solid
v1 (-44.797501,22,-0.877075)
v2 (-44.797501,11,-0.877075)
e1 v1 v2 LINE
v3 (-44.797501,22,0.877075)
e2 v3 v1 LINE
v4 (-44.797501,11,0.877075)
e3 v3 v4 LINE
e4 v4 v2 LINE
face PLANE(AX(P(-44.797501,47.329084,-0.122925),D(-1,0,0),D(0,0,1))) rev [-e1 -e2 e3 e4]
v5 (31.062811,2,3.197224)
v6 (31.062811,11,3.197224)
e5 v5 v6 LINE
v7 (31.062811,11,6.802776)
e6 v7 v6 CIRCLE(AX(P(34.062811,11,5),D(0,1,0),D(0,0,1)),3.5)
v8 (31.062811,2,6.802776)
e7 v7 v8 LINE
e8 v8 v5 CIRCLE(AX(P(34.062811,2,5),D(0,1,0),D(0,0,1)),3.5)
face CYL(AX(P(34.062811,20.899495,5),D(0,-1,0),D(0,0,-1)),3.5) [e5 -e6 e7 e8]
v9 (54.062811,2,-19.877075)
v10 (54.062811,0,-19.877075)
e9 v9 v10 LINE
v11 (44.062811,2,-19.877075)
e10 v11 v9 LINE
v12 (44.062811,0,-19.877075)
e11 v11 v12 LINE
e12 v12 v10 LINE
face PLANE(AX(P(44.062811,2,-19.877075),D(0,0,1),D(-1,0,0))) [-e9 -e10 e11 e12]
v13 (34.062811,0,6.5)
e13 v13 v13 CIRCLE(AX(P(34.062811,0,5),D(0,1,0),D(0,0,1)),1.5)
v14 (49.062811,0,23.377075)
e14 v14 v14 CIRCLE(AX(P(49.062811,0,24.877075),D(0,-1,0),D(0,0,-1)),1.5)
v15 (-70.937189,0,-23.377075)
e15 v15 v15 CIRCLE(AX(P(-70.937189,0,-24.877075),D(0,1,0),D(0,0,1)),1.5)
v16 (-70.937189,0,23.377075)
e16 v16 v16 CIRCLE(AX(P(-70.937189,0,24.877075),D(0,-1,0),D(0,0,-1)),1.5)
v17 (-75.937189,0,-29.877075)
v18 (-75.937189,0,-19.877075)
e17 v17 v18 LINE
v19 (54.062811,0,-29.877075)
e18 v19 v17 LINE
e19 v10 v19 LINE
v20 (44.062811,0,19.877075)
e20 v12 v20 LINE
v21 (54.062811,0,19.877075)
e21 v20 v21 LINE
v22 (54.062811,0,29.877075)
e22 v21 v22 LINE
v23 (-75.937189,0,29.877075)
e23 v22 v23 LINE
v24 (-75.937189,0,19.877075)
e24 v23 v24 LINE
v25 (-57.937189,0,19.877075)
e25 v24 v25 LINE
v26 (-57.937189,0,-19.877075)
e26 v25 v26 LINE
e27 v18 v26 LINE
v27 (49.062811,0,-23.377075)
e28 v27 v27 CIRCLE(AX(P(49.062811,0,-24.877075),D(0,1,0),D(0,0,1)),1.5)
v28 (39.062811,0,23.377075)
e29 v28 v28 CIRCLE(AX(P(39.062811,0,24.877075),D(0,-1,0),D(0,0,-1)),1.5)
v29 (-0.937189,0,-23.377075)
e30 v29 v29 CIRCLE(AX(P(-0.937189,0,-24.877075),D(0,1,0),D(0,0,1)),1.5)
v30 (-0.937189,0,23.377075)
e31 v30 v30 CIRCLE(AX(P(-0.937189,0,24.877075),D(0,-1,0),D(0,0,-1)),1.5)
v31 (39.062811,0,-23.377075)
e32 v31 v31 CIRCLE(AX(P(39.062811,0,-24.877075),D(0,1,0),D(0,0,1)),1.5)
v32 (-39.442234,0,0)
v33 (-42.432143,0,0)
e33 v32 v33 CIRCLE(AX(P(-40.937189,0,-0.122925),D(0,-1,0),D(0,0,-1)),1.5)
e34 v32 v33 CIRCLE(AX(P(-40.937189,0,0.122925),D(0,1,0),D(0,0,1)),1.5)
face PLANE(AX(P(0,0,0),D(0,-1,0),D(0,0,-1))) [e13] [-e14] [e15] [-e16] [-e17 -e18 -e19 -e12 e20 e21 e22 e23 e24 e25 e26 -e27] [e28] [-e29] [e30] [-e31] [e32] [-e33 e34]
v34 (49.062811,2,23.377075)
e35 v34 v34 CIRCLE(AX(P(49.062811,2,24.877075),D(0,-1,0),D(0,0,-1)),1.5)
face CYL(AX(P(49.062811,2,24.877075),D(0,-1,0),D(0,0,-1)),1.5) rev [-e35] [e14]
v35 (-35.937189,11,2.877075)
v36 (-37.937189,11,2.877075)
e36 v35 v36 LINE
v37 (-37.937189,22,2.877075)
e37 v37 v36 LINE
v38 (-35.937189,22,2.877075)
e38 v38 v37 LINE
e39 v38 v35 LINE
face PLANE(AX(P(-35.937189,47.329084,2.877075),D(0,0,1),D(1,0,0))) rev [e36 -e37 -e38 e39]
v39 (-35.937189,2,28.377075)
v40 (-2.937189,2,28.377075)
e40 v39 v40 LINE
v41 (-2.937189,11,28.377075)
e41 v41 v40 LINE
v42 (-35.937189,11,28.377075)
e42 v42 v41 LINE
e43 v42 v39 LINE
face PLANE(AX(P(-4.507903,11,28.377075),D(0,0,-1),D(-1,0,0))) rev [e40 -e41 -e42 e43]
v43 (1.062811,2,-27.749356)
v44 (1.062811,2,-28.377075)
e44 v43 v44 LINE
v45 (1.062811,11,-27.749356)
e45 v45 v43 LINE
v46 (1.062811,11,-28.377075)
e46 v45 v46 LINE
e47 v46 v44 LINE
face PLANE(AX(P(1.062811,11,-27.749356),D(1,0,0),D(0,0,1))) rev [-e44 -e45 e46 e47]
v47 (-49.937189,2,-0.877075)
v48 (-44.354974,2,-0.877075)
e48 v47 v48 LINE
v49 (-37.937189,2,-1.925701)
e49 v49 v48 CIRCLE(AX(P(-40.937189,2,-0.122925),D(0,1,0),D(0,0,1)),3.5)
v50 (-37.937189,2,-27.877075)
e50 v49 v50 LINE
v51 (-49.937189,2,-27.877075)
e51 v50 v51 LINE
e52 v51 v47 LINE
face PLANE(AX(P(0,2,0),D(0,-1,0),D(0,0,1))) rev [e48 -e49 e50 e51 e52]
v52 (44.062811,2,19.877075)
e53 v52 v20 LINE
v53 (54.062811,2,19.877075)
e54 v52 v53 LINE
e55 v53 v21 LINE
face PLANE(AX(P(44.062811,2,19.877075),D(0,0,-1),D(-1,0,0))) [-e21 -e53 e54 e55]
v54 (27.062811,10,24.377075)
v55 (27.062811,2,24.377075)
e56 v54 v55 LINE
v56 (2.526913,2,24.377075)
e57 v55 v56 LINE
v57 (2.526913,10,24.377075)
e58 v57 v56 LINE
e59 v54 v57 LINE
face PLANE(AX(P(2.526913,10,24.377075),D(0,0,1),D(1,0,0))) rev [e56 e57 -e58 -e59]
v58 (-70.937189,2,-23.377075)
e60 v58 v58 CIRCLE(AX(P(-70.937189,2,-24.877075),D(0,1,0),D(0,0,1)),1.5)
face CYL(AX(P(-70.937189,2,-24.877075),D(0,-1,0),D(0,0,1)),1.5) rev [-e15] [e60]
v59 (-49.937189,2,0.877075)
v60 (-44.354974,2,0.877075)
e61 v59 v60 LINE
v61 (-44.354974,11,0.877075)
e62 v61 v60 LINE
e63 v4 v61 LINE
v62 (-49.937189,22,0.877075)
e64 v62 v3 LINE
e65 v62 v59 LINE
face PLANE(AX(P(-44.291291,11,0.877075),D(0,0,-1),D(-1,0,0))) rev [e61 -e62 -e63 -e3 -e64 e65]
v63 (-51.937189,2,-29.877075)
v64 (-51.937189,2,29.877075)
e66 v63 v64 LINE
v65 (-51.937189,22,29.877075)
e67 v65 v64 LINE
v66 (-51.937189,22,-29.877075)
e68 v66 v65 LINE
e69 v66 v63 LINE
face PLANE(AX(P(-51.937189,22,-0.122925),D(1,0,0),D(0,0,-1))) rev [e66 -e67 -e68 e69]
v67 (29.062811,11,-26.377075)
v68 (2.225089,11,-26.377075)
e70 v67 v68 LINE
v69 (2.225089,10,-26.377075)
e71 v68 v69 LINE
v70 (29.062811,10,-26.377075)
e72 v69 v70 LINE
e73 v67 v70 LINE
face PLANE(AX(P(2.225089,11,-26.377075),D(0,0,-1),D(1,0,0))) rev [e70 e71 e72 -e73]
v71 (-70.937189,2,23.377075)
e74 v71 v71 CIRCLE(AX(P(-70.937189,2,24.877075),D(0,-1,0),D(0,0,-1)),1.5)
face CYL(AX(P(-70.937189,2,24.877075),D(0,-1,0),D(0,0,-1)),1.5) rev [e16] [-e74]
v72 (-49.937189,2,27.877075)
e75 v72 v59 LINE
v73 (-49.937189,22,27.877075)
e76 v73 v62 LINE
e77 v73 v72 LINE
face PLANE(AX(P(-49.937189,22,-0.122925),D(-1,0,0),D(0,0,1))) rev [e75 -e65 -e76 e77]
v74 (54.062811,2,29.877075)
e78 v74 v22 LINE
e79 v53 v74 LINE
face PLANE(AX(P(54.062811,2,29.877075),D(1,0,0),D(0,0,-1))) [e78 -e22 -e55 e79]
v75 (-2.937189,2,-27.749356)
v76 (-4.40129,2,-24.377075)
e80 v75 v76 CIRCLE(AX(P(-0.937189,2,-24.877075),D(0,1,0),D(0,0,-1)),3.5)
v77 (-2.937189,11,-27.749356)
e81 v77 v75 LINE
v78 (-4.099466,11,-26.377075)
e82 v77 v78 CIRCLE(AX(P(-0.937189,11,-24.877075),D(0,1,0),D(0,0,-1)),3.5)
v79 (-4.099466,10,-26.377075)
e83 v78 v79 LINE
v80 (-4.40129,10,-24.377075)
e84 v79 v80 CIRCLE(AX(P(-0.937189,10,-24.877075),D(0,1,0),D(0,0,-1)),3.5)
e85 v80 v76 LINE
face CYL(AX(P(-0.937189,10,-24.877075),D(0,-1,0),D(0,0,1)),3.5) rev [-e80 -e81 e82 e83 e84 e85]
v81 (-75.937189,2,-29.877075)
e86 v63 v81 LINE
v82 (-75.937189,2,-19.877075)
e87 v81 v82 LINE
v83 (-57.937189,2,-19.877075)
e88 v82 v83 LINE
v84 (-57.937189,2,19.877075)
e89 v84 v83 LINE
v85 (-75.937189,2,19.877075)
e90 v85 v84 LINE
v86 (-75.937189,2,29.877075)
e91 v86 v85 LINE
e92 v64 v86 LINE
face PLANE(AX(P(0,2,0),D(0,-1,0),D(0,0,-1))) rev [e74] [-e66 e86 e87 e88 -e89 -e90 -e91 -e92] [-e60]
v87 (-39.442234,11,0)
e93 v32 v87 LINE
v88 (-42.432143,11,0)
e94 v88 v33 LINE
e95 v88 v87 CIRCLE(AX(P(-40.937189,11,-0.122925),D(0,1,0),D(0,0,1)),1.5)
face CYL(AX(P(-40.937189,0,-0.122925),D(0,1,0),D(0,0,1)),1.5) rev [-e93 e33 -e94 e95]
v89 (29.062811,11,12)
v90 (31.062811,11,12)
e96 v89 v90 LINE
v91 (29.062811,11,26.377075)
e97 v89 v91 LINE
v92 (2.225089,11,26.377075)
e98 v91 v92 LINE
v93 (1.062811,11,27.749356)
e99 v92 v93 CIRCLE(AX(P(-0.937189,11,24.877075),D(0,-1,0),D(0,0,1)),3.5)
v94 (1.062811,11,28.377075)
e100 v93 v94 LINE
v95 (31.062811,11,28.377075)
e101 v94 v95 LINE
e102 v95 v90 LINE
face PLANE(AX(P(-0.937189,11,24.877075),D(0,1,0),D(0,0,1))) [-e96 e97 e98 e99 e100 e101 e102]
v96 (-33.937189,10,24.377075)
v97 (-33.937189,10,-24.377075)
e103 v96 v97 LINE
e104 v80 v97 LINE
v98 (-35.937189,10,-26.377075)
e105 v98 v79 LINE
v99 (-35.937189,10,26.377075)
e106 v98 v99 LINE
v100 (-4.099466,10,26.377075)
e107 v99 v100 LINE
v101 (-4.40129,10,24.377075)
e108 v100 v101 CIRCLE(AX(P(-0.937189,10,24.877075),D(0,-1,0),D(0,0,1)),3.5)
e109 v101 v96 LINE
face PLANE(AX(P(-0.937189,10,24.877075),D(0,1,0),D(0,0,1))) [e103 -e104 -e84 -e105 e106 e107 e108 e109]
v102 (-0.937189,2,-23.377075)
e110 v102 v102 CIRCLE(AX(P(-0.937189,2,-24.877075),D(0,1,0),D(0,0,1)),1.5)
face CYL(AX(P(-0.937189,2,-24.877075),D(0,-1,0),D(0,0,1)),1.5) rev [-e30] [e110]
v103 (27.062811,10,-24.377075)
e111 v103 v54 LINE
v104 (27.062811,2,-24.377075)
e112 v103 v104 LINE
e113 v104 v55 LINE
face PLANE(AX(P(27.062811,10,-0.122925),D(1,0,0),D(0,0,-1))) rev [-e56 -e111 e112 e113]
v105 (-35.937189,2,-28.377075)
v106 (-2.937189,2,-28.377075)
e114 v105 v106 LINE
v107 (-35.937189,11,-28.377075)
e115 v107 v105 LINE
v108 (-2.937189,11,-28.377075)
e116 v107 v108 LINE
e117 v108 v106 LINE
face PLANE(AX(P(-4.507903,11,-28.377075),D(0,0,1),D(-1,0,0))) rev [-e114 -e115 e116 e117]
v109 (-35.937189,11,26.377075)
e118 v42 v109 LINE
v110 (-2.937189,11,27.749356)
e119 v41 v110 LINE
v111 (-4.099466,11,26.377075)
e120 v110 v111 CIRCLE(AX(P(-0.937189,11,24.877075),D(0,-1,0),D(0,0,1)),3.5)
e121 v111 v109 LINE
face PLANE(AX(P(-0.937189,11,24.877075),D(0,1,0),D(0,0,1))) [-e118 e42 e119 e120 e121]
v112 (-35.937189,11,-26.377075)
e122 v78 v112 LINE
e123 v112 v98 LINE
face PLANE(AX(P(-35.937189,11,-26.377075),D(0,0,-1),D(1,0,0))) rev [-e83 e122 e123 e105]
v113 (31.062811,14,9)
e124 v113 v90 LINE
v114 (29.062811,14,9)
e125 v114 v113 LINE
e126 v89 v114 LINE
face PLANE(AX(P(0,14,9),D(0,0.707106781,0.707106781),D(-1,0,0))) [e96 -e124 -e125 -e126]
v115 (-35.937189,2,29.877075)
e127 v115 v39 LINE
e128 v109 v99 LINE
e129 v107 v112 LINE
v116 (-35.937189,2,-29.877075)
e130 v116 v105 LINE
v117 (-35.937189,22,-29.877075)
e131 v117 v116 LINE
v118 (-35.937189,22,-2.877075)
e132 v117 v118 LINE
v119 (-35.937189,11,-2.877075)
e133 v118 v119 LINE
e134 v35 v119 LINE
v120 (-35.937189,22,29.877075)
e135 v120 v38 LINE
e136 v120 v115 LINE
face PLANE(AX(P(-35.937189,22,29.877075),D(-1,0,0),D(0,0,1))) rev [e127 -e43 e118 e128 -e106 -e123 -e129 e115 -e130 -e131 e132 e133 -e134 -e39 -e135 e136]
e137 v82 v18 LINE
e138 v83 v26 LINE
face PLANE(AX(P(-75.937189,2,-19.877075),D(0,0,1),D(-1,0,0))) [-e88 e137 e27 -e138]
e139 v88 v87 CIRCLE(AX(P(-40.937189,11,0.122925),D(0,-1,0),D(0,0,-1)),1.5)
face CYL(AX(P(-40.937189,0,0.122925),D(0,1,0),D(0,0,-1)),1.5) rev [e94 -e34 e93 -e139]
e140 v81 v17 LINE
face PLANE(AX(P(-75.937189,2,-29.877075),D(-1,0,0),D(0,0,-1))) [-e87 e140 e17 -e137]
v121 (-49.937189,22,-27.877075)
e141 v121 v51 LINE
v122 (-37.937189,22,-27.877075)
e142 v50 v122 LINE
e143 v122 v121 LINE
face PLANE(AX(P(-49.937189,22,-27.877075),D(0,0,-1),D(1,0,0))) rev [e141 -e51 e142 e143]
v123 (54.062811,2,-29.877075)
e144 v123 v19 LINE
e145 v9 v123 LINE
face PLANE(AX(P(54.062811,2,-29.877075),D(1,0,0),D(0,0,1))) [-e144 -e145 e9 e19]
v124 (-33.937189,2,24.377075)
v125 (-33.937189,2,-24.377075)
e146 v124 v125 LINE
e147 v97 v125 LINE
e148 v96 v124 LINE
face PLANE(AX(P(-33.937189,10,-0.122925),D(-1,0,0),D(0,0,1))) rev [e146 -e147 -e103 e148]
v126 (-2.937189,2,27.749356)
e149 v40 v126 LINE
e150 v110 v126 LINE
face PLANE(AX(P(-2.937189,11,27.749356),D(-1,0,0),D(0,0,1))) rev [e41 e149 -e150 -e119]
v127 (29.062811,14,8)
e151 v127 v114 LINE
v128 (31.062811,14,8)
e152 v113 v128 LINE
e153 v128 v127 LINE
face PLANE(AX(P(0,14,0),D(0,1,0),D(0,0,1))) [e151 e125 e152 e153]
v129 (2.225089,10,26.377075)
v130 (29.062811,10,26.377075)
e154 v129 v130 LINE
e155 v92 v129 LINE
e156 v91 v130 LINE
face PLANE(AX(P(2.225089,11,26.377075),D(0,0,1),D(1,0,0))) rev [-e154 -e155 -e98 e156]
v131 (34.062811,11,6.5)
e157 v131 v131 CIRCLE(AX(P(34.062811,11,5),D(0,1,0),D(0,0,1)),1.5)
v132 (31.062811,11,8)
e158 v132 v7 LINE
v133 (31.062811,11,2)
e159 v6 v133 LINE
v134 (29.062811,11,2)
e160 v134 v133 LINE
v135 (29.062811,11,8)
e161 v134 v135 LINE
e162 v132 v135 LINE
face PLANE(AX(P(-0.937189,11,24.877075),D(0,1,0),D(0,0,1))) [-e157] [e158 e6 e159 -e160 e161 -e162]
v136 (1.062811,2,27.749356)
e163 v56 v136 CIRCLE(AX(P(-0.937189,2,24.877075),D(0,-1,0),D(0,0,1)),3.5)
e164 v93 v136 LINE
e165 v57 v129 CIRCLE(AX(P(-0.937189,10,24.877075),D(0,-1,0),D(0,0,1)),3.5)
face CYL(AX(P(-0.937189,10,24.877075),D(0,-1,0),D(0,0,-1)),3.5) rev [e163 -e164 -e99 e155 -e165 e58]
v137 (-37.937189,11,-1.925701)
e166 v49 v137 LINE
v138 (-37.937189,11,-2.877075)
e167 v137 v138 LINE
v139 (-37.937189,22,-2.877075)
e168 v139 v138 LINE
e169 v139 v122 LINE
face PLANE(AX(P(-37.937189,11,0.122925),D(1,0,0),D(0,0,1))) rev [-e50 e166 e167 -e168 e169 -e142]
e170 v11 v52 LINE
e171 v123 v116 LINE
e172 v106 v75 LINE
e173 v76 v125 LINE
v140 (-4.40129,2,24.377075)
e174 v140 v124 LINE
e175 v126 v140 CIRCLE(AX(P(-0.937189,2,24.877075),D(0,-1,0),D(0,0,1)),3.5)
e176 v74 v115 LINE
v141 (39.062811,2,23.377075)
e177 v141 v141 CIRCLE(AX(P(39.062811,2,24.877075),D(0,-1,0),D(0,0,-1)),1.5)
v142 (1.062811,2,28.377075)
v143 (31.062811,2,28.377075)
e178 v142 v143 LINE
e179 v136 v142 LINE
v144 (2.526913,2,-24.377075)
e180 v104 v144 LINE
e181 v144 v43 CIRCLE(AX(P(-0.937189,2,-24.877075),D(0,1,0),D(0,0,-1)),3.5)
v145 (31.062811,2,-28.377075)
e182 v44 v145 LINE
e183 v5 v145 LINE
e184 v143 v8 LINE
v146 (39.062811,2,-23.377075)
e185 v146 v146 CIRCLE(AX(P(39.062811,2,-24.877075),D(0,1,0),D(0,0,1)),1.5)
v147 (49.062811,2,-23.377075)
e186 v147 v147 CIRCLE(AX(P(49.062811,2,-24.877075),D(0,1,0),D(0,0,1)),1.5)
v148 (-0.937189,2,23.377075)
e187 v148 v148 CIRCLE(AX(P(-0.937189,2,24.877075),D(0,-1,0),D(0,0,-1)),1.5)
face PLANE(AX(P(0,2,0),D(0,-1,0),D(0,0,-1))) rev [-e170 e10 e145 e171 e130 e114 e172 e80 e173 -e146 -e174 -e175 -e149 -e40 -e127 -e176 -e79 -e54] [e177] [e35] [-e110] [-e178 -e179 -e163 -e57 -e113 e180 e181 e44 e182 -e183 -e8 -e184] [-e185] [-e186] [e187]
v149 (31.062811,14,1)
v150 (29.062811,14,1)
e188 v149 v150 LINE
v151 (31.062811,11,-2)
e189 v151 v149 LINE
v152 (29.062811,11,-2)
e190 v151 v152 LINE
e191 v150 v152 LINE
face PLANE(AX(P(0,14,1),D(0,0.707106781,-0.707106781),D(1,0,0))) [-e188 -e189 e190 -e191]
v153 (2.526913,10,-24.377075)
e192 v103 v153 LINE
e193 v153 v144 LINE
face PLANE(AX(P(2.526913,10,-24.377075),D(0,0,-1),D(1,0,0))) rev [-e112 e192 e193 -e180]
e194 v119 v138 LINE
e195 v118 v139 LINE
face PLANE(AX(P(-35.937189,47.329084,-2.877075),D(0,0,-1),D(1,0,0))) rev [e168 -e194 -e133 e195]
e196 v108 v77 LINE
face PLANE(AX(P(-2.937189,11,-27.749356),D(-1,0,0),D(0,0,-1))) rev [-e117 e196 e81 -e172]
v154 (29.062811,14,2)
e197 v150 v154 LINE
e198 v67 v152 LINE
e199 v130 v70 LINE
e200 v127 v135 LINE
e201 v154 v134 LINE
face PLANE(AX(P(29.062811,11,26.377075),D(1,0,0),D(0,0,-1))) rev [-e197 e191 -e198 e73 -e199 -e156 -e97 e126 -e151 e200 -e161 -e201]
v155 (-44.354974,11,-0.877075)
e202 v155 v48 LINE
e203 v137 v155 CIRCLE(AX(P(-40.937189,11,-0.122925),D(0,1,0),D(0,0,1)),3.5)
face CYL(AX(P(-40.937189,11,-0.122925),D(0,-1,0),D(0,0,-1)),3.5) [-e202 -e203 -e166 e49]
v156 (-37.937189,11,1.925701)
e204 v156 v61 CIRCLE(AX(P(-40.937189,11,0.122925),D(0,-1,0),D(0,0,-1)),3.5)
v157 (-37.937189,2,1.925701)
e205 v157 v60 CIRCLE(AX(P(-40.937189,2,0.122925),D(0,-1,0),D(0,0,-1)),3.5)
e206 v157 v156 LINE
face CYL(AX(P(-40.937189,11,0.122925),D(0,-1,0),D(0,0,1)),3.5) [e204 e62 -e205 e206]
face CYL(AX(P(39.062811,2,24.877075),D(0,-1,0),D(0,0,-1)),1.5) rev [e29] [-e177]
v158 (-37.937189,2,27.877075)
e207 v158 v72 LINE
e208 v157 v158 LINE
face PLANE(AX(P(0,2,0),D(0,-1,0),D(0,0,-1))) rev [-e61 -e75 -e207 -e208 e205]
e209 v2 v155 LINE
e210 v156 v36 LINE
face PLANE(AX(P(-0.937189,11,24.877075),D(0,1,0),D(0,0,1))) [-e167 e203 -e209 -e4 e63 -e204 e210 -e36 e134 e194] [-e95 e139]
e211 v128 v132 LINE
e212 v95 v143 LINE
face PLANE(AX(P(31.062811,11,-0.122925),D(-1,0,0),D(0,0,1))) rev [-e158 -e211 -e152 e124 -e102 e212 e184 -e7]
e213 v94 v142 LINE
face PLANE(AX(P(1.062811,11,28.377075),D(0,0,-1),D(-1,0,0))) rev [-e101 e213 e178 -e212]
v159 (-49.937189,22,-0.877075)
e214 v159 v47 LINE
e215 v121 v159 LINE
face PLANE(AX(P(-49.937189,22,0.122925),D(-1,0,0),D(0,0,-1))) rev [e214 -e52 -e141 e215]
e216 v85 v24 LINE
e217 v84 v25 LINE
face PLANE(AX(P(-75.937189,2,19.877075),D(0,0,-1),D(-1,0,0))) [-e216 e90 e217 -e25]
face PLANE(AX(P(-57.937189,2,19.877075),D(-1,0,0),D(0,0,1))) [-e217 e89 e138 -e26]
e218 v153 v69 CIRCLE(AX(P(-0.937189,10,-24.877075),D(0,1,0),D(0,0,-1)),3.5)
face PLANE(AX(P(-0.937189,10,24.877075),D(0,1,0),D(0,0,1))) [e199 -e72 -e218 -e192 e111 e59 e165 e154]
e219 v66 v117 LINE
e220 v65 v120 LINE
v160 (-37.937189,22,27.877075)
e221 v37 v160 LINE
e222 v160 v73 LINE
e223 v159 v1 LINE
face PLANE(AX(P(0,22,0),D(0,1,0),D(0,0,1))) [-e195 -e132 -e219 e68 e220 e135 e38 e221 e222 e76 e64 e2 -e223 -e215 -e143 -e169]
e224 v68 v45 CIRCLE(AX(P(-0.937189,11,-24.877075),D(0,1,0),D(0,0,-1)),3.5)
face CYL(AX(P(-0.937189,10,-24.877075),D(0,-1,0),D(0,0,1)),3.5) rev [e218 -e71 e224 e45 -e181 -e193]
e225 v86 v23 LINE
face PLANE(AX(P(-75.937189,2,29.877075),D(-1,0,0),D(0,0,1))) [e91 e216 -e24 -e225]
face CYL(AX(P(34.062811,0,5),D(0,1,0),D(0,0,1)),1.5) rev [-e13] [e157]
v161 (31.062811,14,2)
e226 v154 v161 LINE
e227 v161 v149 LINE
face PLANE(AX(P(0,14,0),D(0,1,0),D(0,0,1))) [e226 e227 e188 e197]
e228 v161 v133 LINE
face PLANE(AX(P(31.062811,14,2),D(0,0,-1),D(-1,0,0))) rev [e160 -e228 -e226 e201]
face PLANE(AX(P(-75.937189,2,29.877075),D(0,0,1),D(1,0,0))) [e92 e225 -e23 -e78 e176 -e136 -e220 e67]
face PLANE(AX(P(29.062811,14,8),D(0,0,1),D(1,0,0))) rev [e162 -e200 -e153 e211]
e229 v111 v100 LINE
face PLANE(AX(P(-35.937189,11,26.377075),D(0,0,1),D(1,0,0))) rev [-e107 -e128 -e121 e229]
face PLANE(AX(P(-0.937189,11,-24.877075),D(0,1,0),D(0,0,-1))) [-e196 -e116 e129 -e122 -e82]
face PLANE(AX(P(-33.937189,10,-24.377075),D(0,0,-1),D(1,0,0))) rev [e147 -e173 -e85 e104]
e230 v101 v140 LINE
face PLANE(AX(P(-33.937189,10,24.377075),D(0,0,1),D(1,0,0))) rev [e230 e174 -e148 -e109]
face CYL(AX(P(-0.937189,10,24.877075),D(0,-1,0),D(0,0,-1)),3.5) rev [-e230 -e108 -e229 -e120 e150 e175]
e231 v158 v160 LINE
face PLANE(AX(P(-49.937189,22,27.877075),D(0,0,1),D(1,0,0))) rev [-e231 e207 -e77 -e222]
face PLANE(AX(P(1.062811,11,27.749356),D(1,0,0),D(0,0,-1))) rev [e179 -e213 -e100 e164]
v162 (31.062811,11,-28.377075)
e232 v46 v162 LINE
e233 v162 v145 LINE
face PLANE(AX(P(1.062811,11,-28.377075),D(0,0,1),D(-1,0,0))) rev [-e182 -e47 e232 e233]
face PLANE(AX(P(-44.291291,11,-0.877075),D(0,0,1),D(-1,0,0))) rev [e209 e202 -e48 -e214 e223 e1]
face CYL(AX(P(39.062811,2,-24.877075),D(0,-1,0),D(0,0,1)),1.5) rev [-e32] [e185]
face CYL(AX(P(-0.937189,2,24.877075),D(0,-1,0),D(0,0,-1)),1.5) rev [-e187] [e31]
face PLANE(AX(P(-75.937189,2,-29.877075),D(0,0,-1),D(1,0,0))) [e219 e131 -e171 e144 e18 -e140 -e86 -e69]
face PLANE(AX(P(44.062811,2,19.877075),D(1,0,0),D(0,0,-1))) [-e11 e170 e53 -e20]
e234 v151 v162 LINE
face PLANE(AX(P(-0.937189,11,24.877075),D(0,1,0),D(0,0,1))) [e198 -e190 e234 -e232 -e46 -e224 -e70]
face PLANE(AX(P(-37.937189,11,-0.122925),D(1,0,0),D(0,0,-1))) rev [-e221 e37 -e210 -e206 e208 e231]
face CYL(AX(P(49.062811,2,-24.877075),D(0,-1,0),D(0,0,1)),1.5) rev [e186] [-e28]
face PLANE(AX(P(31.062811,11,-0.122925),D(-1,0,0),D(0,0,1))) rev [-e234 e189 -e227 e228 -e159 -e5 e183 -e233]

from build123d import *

# Parameters (mm, degrees)
SZKIC1_W                        = 10
SZKIC1_H                        = 10
DODANIE_WYCI_GNI_CIE1_DEPTH     = 2
SZKIC3_R                        = 1.5
DODANIE_WYCI_GNI_CIE2_DEPTH     = 2
DODANIE_WYCI_GNI_CIE11_DEPTH    = 8
DODANIE_WYCI_GNI_CIE12_DEPTH    = 20
DODANIE_WYCI_GNI_CIE13_DEPTH    = 9
SZKIC7_R                        = 1.5
WYTNIJ_WYCI_GNI_CIE1_DEPTH      = 85.018427919
DODANIE_WYCI_GNI_CIE15_DEPTH    = 9
SZKIC9_W                        = 2
SZKIC9_H                        = 25.25
SZKIC9_W_2                      = 5.139687394
SZKIC9_H_2                      = 1
DODANIE_WYCI_GNI_CIE16_DEPTH    = 11
SZKIC10_R                       = 1.5
WYTNIJ_WYCI_GNI_CIE2_DEPTH      = 85.51683992
LUSTRO4_OUTLINE_R               = 1.5
LUSTRO4_DEPTH                   = 2
LUSTRO4_START                   = 2
LUSTRO4_2_DEPTH                 = 8
LUSTRO4_START_2                 = 10
LUSTRO4_3_DEPTH                 = 12
LUSTRO4_4_DEPTH                 = 1
WYTNIJ_WYCI_GNI_CIE3_DEPTH      = 85.018427919
WYTNIJ_WYCI_GNI_CIE3_DEPTH_BACK = 85.018427919
SZKIC11_R                       = 1.5
DODANIE_WYCI_GNI_CIE17_START    = 9
SZKIC12_R                       = 3.5
SZKIC12_R_2                     = 1.5
DODANIE_WYCI_GNI_CIE17_DEPTH    = 9
SZKIC13_W                       = 2
SZKIC13_H                       = 4
DODANIE_WYCI_GNI_CIE18_DEPTH    = 3
SFAZOWANIE2_SIZE                = 3


# Read off the part's stored shape, not the designer's step: Lustro4
with BuildPart() as part:
    # Szkic1 → Dodanie-wyciągnięcie1 (new body)
    with BuildSketch(Plane(origin=(0, 0, 0), x_dir=(1, 0, 0), z_dir=(0, 1, 0))):
        with Locations((-5, -5)):
            Rectangle(SZKIC1_W, SZKIC1_H)
    extrude(amount=DODANIE_WYCI_GNI_CIE1_DEPTH)



with BuildPart() as body_2:
    # Szkic3 → Dodanie-wyciągnięcie2 (new body)
    with BuildSketch(Plane.XZ):
        Polygon((-75.937188702, 29.877074857), (44.062811298, 29.877074857), (54.062811298, 29.877074857), (54.062811298, 19.877074857), (44.062811298, 19.877074857), (44.062811298, -0.122925143), (-57.937188702, -0.122925143), (-57.937188702, 19.877074857), (-75.937188702, 19.877074857), align=None)
        with Locations(Location((-70.937188702, 24.877074857, 0), (0, 0, 270))):
            Circle(SZKIC3_R, mode=Mode.SUBTRACT)
        with Locations(Location((39.062811298, 24.877074857, 0), (0, 0, 270))):
            Circle(SZKIC3_R, mode=Mode.SUBTRACT)
        with Locations(Location((-0.937188702, 24.877074857, 0), (0, 0, 270))):
            Circle(SZKIC3_R, mode=Mode.SUBTRACT)
        with Locations(Location((49.062811298, 24.877074857, 0), (0, 0, 270))):
            Circle(SZKIC3_R, mode=Mode.SUBTRACT)
    extrude(amount=-DODANIE_WYCI_GNI_CIE2_DEPTH)

    # Szkic4 → Dodanie-wyciągnięcie11 (add)
    with BuildSketch(Plane(origin=(0, 2, 0), x_dir=(1, 0, 0), z_dir=(0, 1, 0))):
        with BuildLine():
            Line((29.062811298, 0.122925143), (27.062811298, 0.122925143))
            Line((27.062811298, 0.122925143), (27.062811298, -24.377074857))
            Line((27.062811298, -24.377074857), (4.540036873, -24.377074857))
            Line((4.540036873, -24.377074857), (2.526912913, -24.377074857))
            ThreePointArc((2.526912913, -24.377074857), (2.523624146, -25.399352968), (2.225088958, -26.377074857))
            Line((2.225088958, -26.377074857), (4.35431392, -26.377074857))
            Line((4.35431392, -26.377074857), (29.062811298, -26.377074857))
            Line((29.062811298, -26.377074857), (29.062811298, 0.122925143))
        make_face()
        with BuildLine():
            Line((-35.937188702, 0.122925143), (-35.937188702, -26.377074857))
            Line((-35.937188702, -26.377074857), (-6.228691325, -26.377074857))
            Line((-6.228691325, -26.377074857), (-4.099466363, -26.377074857))
            ThreePointArc((-4.099466363, -26.377074857), (-4.398001551, -25.399352968), (-4.401290318, -24.377074857))
            Line((-4.401290318, -24.377074857), (-6.414414278, -24.377074857))
            Line((-6.414414278, -24.377074857), (-33.937188702, -24.377074857))
            Line((-33.937188702, -24.377074857), (-33.937188702, 0.122925143))
            Line((-33.937188702, 0.122925143), (-35.937188702, 0.122925143))
        make_face()
    extrude(amount=DODANIE_WYCI_GNI_CIE11_DEPTH)

    # Szkic5 → Dodanie-wyciągnięcie12 (add)
    with BuildSketch(Plane(origin=(0, 2, 0), x_dir=(1, 0, 0), z_dir=(0, 1, 0))):
        Polygon((-51.937188702, 0.122925143), (-49.937188702, 0.122925143), (-49.937188702, -27.877074857), (-35.937188702, -27.877074857), (-35.937188702, -29.877074857), (-51.937188702, -29.877074857), align=None)
    extrude(amount=DODANIE_WYCI_GNI_CIE12_DEPTH)

    # Szkic6 → Dodanie-wyciągnięcie13 (add)
    with BuildSketch(Plane(origin=(0, 2, 0), x_dir=(1, 0, 0), z_dir=(0, 1, 0))):
        with BuildLine():
            Line((-37.937188702, 0.122925143), (-35.937188702, 0.122925143))
            Line((-35.937188702, 0.122925143), (-35.937188702, -26.377074857))
            Line((-35.937188702, -26.377074857), (-4.099466363, -26.377074857))
            ThreePointArc((-4.099466363, -26.377074857), (-3.607968863, -27.139138811), (-2.937188702, -27.74935618))
            Line((-2.937188702, -27.74935618), (-2.937188702, -28.377074857))
            Line((-2.937188702, -28.377074857), (-4.507902917, -28.377074857))
            Line((-4.507902917, -28.377074857), (-37.937188702, -28.377074857))
            Line((-37.937188702, -28.377074857), (-37.937188702, 0.122925143))
        make_face()
        with BuildLine():
            Line((31.062811298, 0.122925143), (31.062811298, -28.377074857))
            Line((31.062811298, -28.377074857), (2.633525512, -28.377074857))
            Line((2.633525512, -28.377074857), (1.062811298, -28.377074857))
            Line((1.062811298, -28.377074857), (1.062811298, -27.74935618))
            ThreePointArc((1.062811298, -27.74935618), (1.733591458, -27.139138811), (2.225088958, -26.377074857))
            Line((2.225088958, -26.377074857), (29.062811298, -26.377074857))
            Line((29.062811298, -26.377074857), (29.062811298, 0.122925143))
            Line((29.062811298, 0.122925143), (31.062811298, 0.122925143))
        make_face()
    extrude(amount=DODANIE_WYCI_GNI_CIE13_DEPTH)

    # Szkic7 → Wytnij-wyciągnięcie1 (cut, symmetric)
    with BuildSketch(Plane(origin=(0, 2, 0), x_dir=(1, 0, 0), z_dir=(0, 1, 0))):
        with Locations((-40.937188702, 0.122925143)):
            Circle(SZKIC7_R)
    extrude(amount=WYTNIJ_WYCI_GNI_CIE1_DEPTH, both=True, mode=Mode.SUBTRACT)

    # Szkic8 → Dodanie-wyciągnięcie15 (add)
    with BuildSketch(Plane(origin=(0, 2, 0), x_dir=(1, 0, 0), z_dir=(0, 1, 0))):
        with BuildLine():
            Line((-37.937188702, 0.122925143), (-37.437188702, 0.122925143))
            ThreePointArc((-37.437188702, 0.122925143), (-40.937188702, 3.622925143), (-44.437188702, 0.122925143))
            Line((-44.437188702, 0.122925143), (-49.937188702, 0.122925143))
            Line((-49.937188702, 0.122925143), (-49.937188702, -0.877074857))
            Line((-49.937188702, -0.877074857), (-44.291290669, -0.877074857))
            ThreePointArc((-44.291290669, -0.877074857), (-40.937188702, -3.377074857), (-37.583086736, -0.877074857))
            Line((-37.583086736, -0.877074857), (-37.937188702, -0.877074857))
            Line((-37.937188702, -0.877074857), (-37.937188702, 0.122925143))
        make_face()
    extrude(amount=DODANIE_WYCI_GNI_CIE15_DEPTH)

    # Szkic9 → Dodanie-wyciągnięcie16 (add)
    with BuildSketch(Plane(origin=(0, 11, 0), x_dir=(1, 0, 0), z_dir=(0, 1, 0))):
        with Locations((-36.937188702, -15.502074857)):
            Rectangle(SZKIC9_W, SZKIC9_H)
        with Locations((-47.367345005, -0.377074857)):
            Rectangle(SZKIC9_W_2, SZKIC9_H_2)
    extrude(amount=DODANIE_WYCI_GNI_CIE16_DEPTH)

    # Szkic10 → Wytnij-wyciągnięcie2 (cut, through all)
    with BuildSketch(Plane.XZ):
        with Locations(Location((-40.937188702, -0.122925143, 0), (0, 0, 90))):
            Circle(SZKIC10_R)
    extrude(amount=-WYTNIJ_WYCI_GNI_CIE2_DEPTH, mode=Mode.SUBTRACT)


with BuildPart() as part_1:
    add(part.part)

    add(body_2.part)  # Lustro4 merges body 2
    # Lustro4 outline → Lustro4 (add)
    with BuildSketch(Plane(origin=(0, 0, 0), x_dir=(1, 0, 0), z_dir=(0, 1, 0))):
        with BuildLine():
            Line((-39.437188702, 0.122925143), (44.062811298, 0.122925143))
            Line((44.062811298, 0.122925143), (44.062811298, 19.877074857))
            Line((44.062811298, 19.877074857), (54.062811298, 19.877074857))
            Line((54.062811298, 19.877074857), (54.062811298, 29.877074857))
            Line((54.062811298, 29.877074857), (-75.937188702, 29.877074857))
            Line((-75.937188702, 29.877074857), (-75.937188702, 19.877074857))
            Line((-75.937188702, 19.877074857), (-57.937188702, 19.877074857))
            Line((-57.937188702, 19.877074857), (-57.937188702, 0.122925143))
            Line((-57.937188702, 0.122925143), (-42.437188702, 0.122925143))
            ThreePointArc((-42.437188702, 0.122925143), (-42.435926834, 0.061410823), (-42.432143353, 0))
            ThreePointArc((-42.432143353, 0), (-40.937188702, 1.377074857), (-39.442234051, 0))
            ThreePointArc((-39.442234051, 0), (-39.43845057, 0.061410823), (-39.437188702, 0.122925143))
        make_face()
        with Locations((49.062811298, 24.877074857)):
            Circle(LUSTRO4_OUTLINE_R, mode=Mode.SUBTRACT)
        with Locations((-0.937188702, 24.877074857)):
            Circle(LUSTRO4_OUTLINE_R, mode=Mode.SUBTRACT)
        with Locations((39.062811298, 24.877074857)):
            Circle(LUSTRO4_OUTLINE_R, mode=Mode.SUBTRACT)
        with Locations((-70.937188702, 24.877074857)):
            Circle(LUSTRO4_OUTLINE_R, mode=Mode.SUBTRACT)
    extrude(amount=LUSTRO4_DEPTH)

    # Lustro4 2 outline → Lustro4 2 (add)
    with BuildSketch(Plane(origin=(0, 0, 0), x_dir=(1, 0, 0), z_dir=(0, 1, 0)).offset(LUSTRO4_START)):
        with BuildLine():
            ThreePointArc((-37.937188702, 1.925700781), (-37.564504311, 1.05833949), (-37.437188702, 0.122925143))
            Line((-37.437188702, 0.122925143), (-33.937188702, 0.122925143))
            Line((-33.937188702, 0.122925143), (-33.937188702, 24.377074857))
            Line((-33.937188702, 24.377074857), (-4.401290318, 24.377074857))
            ThreePointArc((-4.401290318, 24.377074857), (-4.147667163, 26.270928527), (-2.937188702, 27.74935618))
            Line((-2.937188702, 27.74935618), (-2.937188702, 28.377074857))
            Line((-2.937188702, 28.377074857), (-35.937188702, 28.377074857))
            Line((-35.937188702, 28.377074857), (-35.937188702, 29.877074857))
            Line((-35.937188702, 29.877074857), (-51.937188702, 29.877074857))
            Line((-51.937188702, 29.877074857), (-51.937188702, 0.122925143))
            Line((-51.937188702, 0.122925143), (-44.437188702, 0.122925143))
            ThreePointArc((-44.437188702, 0.122925143), (-44.416574388, 0.502234055), (-44.354974273, 0.877074857))
            Line((-44.354974273, 0.877074857), (-49.937188702, 0.877074857))
            Line((-49.937188702, 0.877074857), (-49.937188702, 27.877074857))
            Line((-49.937188702, 27.877074857), (-37.937188702, 27.877074857))
            Line((-37.937188702, 27.877074857), (-37.937188702, 1.925700781))
        make_face()
        with BuildLine():
            Line((-44.291290669, -0.877074857), (-44.354974274, -0.877074857))
            ThreePointArc((-44.354974274, -0.877074857), (-41.501582428, -3.577119654), (-37.937188702, -1.925700781))
            Line((-37.937188702, -1.925700781), (-37.937188702, -1.679850495))
            ThreePointArc((-37.937188702, -1.679850495), (-41.37589046, -3.349471834), (-44.291290669, -0.877074857))
        make_face()
        with BuildLine():
            ThreePointArc((-39.442234051, 0), (-40.937188702, 1.622925143), (-42.432143353, 0))
            ThreePointArc((-42.432143353, 0), (-40.937188702, 1.377074857), (-39.442234051, 0))
        make_face()
        with BuildLine():
            Line((27.062811298, 24.377074857), (27.062811298, 0.122925143))
            Line((27.062811298, 0.122925143), (31.062811298, 0.122925143))
            Line((31.062811298, 0.122925143), (31.062811298, 28.377074857))
            Line((31.062811298, 28.377074857), (1.062811298, 28.377074857))
            Line((1.062811298, 28.377074857), (1.062811298, 27.74935618))
            ThreePointArc((1.062811298, 27.74935618), (2.273289758, 26.270928527), (2.526912913, 24.377074857))
            Line((2.526912913, 24.377074857), (27.062811298, 24.377074857))
        make_face()
    extrude(amount=LUSTRO4_2_DEPTH)

    # Lustro4 3 outline → Lustro4 3 (add)
    with BuildSketch(Plane(origin=(0, 0, 0), x_dir=(1, 0, 0), z_dir=(0, 1, 0)).offset(LUSTRO4_START_2)):
        Polygon((-37.937188702, 27.877074857), (-37.937188702, 2.877074857), (-35.937188702, 2.877074857), (-35.937188702, 29.877074857), (-51.937188702, 29.877074857), (-51.937188702, 0.122925143), (-44.797501308, 0.122925143), (-44.797501308, 0.877074857), (-49.937188702, 0.877074857), (-49.937188702, 27.877074857), align=None)
    extrude(amount=LUSTRO4_3_DEPTH)

    # Lustro4 4 outline → Lustro4 4 (add)
    with BuildSketch(Plane(origin=(0, 0, 0), x_dir=(1, 0, 0), z_dir=(0, 1, 0)).offset(LUSTRO4_START_2)):
        with BuildLine():
            Line((-37.937188702, 2.877074857), (-37.937188702, 1.925700781))
            ThreePointArc((-37.937188702, 1.925700781), (-37.564504311, 1.05833949), (-37.437188702, 0.122925143))
            Line((-37.437188702, 0.122925143), (-35.937188702, 0.122925143))
            Line((-35.937188702, 0.122925143), (-35.937188702, 2.877074857))
            Line((-35.937188702, 2.877074857), (-37.937188702, 2.877074857))
        make_face()
        with BuildLine():
            ThreePointArc((-44.437188702, 0.122925143), (-44.416574388, 0.502234055), (-44.354974273, 0.877074857))
            Line((-44.354974273, 0.877074857), (-44.797501308, 0.877074857))
            Line((-44.797501308, 0.877074857), (-44.797501308, 0.122925143))
            Line((-44.797501308, 0.122925143), (-44.437188702, 0.122925143))
        make_face()
        with BuildLine():
            Line((-44.291290669, -0.877074857), (-44.354974274, -0.877074857))
            ThreePointArc((-44.354974274, -0.877074857), (-41.501582428, -3.577119654), (-37.937188702, -1.925700781))
            Line((-37.937188702, -1.925700781), (-37.937188702, -1.679850495))
            ThreePointArc((-37.937188702, -1.679850495), (-41.37589046, -3.349471834), (-44.291290669, -0.877074857))
        make_face()
        with BuildLine():
            ThreePointArc((-39.442234051, 0), (-40.937188702, 1.622925143), (-42.432143353, 0))
            ThreePointArc((-42.432143353, 0), (-40.937188702, 1.377074857), (-39.442234051, 0))
        make_face()
        with BuildLine():
            Line((-35.937188702, 28.377074857), (-35.937188702, 26.377074857))
            Line((-35.937188702, 26.377074857), (-4.099466363, 26.377074857))
            ThreePointArc((-4.099466363, 26.377074857), (-3.607968863, 27.139138811), (-2.937188702, 27.74935618))
            Line((-2.937188702, 27.74935618), (-2.937188702, 28.377074857))
            Line((-2.937188702, 28.377074857), (-35.937188702, 28.377074857))
        make_face()
        with BuildLine():
            Line((29.062811298, 26.377074857), (29.062811298, 0.122925143))
            Line((29.062811298, 0.122925143), (31.062811298, 0.122925143))
            Line((31.062811298, 0.122925143), (31.062811298, 28.377074857))
            Line((31.062811298, 28.377074857), (1.062811298, 28.377074857))
            Line((1.062811298, 28.377074857), (1.062811298, 27.74935618))
            ThreePointArc((1.062811298, 27.74935618), (1.733591458, 27.139138811), (2.225088958, 26.377074857))
            Line((2.225088958, 26.377074857), (29.062811298, 26.377074857))
        make_face()
    extrude(amount=LUSTRO4_4_DEPTH)

    # Szkic11 → Wytnij-wyciągnięcie3 (cut, two sides: drawn at the far end of the back side and taken through both)
    with BuildSketch(Plane(origin=(0, 2, 0), x_dir=(1, 0, 0), z_dir=(0, 1, 0)).offset(-WYTNIJ_WYCI_GNI_CIE3_DEPTH_BACK)):
        with Locations(Location((34.062811298, -5, 0), (0, 0, 270))):
            Circle(SZKIC11_R)
    extrude(amount=WYTNIJ_WYCI_GNI_CIE3_DEPTH + WYTNIJ_WYCI_GNI_CIE3_DEPTH_BACK, mode=Mode.SUBTRACT)

    # Szkic12 → Dodanie-wyciągnięcie17 (add)
    with BuildSketch(Plane(origin=(0, 2, 0), x_dir=(1, 0, 0), z_dir=(0, 1, 0)).offset(DODANIE_WYCI_GNI_CIE17_START)):
        with Locations((34.062811298, -5)):
            Circle(SZKIC12_R)
        with Locations(Location((34.062811298, -5, 0), (0, 0, 270))):
            Circle(SZKIC12_R_2, mode=Mode.SUBTRACT)
    extrude(amount=-DODANIE_WYCI_GNI_CIE17_DEPTH)

    # Szkic13 → Dodanie-wyciągnięcie18 (add)
    with BuildSketch(Plane(origin=(0, 11, 0), x_dir=(1, 0, 0), z_dir=(0, 1, 0))):
        with Locations((30.062811298, 0)):
            Rectangle(SZKIC13_W, SZKIC13_H)
        with Locations((30.062811298, -10)):
            Rectangle(SZKIC13_W, SZKIC13_H)
    extrude(amount=DODANIE_WYCI_GNI_CIE18_DEPTH)

    # Sfazowanie2
    sfazowanie2_edges = [part_1.edges().sort_by_distance(p)[0] for p in [
        (30.062811298, 14, 12),
        (30.062811298, 14, -2),
    ]]
    chamfer(sfazowanie2_edges, length=SFAZOWANIE2_SIZE - 0.0001)  # a hair under: the kernel refuses the full size


solid = part_1.part
